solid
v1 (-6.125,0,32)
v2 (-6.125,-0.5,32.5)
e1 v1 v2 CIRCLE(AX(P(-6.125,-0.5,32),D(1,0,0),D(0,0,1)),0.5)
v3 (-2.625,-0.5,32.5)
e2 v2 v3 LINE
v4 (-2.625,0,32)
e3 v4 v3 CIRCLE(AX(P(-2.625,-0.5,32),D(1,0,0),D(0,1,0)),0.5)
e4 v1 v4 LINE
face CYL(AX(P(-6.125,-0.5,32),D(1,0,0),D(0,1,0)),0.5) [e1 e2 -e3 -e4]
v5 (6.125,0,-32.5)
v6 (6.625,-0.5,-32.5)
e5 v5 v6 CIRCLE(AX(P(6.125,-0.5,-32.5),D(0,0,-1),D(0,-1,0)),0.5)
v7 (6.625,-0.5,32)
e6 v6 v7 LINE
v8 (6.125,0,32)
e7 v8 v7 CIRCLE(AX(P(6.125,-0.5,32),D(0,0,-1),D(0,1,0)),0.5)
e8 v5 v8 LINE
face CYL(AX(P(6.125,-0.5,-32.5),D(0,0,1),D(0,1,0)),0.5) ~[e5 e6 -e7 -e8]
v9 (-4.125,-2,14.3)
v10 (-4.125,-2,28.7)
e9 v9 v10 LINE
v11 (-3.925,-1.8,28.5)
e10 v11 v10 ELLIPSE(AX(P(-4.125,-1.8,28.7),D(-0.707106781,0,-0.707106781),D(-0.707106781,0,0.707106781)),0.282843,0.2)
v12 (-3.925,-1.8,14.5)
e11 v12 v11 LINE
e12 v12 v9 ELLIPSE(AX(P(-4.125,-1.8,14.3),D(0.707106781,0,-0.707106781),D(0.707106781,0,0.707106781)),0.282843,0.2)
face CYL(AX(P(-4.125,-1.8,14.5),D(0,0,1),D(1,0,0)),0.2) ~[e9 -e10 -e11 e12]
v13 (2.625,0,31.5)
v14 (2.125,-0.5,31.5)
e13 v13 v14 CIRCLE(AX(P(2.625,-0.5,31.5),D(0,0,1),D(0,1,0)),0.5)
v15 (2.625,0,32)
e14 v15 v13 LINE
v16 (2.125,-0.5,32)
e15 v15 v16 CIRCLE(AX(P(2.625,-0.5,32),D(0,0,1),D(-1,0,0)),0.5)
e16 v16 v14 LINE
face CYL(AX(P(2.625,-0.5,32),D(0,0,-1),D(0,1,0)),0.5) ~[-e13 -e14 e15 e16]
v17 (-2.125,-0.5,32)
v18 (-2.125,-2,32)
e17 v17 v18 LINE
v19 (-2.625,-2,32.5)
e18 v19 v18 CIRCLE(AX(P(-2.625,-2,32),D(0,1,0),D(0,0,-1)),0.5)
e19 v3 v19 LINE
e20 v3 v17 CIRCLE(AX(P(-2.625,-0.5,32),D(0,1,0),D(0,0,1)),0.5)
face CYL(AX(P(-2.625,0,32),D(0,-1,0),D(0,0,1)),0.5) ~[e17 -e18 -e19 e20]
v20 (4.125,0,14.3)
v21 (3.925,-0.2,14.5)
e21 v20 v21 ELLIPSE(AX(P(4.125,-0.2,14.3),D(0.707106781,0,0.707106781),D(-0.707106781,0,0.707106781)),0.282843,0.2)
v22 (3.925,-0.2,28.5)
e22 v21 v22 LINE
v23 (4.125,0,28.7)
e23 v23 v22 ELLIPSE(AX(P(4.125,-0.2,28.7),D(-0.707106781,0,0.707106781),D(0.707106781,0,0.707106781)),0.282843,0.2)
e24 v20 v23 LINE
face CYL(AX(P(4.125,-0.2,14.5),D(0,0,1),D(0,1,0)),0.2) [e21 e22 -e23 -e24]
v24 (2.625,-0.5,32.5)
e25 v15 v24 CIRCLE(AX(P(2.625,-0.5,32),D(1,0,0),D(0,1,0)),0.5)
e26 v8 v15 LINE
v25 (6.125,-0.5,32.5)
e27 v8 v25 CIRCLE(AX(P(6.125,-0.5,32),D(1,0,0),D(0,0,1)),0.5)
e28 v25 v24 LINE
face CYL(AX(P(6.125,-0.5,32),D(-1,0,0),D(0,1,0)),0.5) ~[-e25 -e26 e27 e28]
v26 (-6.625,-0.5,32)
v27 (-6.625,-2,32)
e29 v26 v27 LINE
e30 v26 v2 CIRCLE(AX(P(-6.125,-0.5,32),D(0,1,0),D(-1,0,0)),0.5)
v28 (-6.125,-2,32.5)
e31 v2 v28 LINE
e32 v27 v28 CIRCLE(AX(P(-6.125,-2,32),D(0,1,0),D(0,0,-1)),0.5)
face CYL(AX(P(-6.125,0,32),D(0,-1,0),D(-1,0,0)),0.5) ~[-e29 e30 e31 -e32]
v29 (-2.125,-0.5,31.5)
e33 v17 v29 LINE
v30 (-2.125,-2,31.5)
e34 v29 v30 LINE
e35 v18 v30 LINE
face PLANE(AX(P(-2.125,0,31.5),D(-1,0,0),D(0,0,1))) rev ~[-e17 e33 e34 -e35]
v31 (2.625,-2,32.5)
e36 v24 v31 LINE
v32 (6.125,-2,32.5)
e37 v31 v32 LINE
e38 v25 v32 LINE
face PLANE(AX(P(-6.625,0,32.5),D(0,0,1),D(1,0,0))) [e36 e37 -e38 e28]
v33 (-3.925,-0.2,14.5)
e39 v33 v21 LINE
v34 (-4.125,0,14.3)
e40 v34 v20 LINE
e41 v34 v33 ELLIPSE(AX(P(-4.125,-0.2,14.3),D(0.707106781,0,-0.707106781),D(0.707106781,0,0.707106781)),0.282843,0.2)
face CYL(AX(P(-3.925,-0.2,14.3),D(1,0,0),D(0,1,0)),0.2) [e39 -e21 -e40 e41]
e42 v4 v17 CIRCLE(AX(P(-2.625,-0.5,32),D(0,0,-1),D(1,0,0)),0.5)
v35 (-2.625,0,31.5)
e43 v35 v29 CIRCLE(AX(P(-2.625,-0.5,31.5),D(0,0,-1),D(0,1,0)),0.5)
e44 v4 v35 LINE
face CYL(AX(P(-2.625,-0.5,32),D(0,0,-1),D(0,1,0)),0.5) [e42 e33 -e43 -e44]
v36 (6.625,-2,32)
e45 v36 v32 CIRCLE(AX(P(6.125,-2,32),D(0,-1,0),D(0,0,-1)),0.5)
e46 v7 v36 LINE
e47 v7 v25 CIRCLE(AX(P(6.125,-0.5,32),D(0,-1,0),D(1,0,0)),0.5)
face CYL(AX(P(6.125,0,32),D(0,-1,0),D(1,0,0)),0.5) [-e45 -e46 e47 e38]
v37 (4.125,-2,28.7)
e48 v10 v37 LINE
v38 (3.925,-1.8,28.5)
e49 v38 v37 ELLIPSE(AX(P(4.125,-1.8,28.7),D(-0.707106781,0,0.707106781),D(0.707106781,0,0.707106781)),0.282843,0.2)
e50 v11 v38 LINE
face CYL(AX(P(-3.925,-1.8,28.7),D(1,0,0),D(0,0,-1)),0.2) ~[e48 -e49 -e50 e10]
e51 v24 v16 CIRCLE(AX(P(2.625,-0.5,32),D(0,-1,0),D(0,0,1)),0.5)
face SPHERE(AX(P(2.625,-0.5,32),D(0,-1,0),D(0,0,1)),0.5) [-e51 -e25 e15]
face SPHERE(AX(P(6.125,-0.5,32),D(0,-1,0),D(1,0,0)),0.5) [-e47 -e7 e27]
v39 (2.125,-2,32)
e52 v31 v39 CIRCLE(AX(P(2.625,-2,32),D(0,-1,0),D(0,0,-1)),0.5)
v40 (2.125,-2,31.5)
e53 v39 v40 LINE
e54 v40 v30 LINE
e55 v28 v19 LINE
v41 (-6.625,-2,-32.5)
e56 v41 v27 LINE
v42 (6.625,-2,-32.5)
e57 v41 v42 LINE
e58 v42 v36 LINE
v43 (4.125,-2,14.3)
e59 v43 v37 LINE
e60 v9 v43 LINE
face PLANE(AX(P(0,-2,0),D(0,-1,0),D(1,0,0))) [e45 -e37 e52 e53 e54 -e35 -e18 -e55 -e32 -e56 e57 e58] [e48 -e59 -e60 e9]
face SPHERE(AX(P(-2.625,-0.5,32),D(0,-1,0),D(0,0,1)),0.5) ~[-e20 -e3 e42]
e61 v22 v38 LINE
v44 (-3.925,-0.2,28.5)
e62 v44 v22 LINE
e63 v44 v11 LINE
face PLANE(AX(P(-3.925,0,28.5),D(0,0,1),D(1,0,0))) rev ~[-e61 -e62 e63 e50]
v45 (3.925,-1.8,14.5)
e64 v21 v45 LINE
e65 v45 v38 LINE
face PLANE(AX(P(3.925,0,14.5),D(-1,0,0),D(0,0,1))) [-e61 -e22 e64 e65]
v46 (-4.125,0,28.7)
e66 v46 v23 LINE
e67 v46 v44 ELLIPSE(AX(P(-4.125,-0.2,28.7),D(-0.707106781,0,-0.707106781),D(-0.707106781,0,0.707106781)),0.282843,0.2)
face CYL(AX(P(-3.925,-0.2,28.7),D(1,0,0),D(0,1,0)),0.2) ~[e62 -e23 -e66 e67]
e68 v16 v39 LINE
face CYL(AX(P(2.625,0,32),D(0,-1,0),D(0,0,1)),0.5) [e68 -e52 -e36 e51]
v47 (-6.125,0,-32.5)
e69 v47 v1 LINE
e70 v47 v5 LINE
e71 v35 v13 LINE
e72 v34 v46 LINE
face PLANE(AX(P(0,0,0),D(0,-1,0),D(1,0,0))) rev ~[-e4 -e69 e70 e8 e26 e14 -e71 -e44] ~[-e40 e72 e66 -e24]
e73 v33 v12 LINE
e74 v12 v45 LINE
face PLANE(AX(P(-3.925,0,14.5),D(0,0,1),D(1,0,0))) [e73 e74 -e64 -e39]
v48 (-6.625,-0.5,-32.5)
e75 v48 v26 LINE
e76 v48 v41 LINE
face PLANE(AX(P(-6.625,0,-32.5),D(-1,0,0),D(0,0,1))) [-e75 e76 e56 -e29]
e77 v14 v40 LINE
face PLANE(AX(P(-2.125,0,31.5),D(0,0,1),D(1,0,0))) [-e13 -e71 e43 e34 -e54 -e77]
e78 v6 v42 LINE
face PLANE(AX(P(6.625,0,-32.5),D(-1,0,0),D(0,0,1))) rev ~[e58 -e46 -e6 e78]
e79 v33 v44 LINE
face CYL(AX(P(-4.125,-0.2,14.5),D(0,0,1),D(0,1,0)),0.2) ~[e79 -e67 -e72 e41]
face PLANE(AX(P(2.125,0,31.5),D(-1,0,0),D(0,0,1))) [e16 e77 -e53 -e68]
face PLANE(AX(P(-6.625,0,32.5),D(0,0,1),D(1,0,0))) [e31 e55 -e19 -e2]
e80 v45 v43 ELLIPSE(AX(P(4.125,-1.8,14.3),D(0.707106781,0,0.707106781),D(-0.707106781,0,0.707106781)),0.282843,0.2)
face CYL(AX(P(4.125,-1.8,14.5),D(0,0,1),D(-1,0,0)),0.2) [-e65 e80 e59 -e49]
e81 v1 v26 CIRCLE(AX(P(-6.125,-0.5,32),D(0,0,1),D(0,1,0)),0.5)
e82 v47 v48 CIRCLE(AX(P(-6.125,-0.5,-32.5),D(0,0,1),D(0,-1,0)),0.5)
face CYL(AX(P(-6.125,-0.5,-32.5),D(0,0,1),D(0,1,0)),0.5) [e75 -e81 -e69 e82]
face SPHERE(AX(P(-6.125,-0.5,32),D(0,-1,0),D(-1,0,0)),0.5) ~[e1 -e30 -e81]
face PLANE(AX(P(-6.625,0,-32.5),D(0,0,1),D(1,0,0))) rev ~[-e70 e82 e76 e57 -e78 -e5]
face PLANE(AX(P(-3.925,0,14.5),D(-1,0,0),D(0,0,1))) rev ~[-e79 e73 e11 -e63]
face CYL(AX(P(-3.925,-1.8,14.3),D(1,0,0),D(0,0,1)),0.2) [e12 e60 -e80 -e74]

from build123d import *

# Parameters (mm, degrees)
F0_W     = 13.25
F0_H     = 65
F0_W_2   = 7.85
F0_H_2   = 14
F1_DEPTH = 2
F3_W     = 4.25
F3_H     = 2.1652186014
F4_DEPTH = 25
F5_R     = 0.5
F6_R     = 0.5
F7_R     = 0.2
F8_R     = 0.5


# Not quite as in the source:
# - the program builds the solid bodies; features that only make, move or delete a surface that nothing else refers to are left out


with BuildPart() as f1:
    # F0 (on Front) → F1 (new body)
    with BuildSketch(Plane.XZ):
        Rectangle(F0_W, F0_H)
        with Locations((0, 21.5)):
            Rectangle(F0_W_2, F0_H_2, mode=Mode.SUBTRACT)
    extrude(amount=F1_DEPTH)

    # F3 (on Front) → F4 (cut)
    with BuildSketch(Plane.XZ):
        with Locations((0, 32.5826093007)):
            Rectangle(F3_W, F3_H)
    extrude(amount=F4_DEPTH, mode=Mode.SUBTRACT)

    # F5
    f5_edges = [f1.edges().sort_by_distance(p)[0] for p in [
        (-2.125, -1, 32.5),
        (-6.625, -1, 32.5),
    ]]
    fillet(f5_edges, radius=F5_R)

    # F6
    f6_edges = [f1.edges().sort_by_distance(p)[0] for p in [
        (2.125, -1, 32.5),
        (6.625, -1, 32.5),
    ]]
    fillet(f6_edges, radius=F6_R)

    # F7
    f7_edges = [f1.edges().sort_by_distance(p)[0] for p in [
        (-3.925, -2, 21.5),
        (3.925, -2, 21.5),
        (3.925, 0, 21.5),
        (-3.925, 0, 21.5),
        (0, 0, 28.5),
        (0, -2, 28.5),
        (0, -2, 14.5),
        (0, 0, 14.5),
    ]]
    fillet(f7_edges, radius=F7_R)

    # F8
    f8_edges = [f1.edges().sort_by_distance(p)[0] for p in [
        (-6.625, 0, -0.25),
        (6.625, 0, -0.25),
    ]]
    fillet(f8_edges, radius=F8_R)


solid = f1.part
